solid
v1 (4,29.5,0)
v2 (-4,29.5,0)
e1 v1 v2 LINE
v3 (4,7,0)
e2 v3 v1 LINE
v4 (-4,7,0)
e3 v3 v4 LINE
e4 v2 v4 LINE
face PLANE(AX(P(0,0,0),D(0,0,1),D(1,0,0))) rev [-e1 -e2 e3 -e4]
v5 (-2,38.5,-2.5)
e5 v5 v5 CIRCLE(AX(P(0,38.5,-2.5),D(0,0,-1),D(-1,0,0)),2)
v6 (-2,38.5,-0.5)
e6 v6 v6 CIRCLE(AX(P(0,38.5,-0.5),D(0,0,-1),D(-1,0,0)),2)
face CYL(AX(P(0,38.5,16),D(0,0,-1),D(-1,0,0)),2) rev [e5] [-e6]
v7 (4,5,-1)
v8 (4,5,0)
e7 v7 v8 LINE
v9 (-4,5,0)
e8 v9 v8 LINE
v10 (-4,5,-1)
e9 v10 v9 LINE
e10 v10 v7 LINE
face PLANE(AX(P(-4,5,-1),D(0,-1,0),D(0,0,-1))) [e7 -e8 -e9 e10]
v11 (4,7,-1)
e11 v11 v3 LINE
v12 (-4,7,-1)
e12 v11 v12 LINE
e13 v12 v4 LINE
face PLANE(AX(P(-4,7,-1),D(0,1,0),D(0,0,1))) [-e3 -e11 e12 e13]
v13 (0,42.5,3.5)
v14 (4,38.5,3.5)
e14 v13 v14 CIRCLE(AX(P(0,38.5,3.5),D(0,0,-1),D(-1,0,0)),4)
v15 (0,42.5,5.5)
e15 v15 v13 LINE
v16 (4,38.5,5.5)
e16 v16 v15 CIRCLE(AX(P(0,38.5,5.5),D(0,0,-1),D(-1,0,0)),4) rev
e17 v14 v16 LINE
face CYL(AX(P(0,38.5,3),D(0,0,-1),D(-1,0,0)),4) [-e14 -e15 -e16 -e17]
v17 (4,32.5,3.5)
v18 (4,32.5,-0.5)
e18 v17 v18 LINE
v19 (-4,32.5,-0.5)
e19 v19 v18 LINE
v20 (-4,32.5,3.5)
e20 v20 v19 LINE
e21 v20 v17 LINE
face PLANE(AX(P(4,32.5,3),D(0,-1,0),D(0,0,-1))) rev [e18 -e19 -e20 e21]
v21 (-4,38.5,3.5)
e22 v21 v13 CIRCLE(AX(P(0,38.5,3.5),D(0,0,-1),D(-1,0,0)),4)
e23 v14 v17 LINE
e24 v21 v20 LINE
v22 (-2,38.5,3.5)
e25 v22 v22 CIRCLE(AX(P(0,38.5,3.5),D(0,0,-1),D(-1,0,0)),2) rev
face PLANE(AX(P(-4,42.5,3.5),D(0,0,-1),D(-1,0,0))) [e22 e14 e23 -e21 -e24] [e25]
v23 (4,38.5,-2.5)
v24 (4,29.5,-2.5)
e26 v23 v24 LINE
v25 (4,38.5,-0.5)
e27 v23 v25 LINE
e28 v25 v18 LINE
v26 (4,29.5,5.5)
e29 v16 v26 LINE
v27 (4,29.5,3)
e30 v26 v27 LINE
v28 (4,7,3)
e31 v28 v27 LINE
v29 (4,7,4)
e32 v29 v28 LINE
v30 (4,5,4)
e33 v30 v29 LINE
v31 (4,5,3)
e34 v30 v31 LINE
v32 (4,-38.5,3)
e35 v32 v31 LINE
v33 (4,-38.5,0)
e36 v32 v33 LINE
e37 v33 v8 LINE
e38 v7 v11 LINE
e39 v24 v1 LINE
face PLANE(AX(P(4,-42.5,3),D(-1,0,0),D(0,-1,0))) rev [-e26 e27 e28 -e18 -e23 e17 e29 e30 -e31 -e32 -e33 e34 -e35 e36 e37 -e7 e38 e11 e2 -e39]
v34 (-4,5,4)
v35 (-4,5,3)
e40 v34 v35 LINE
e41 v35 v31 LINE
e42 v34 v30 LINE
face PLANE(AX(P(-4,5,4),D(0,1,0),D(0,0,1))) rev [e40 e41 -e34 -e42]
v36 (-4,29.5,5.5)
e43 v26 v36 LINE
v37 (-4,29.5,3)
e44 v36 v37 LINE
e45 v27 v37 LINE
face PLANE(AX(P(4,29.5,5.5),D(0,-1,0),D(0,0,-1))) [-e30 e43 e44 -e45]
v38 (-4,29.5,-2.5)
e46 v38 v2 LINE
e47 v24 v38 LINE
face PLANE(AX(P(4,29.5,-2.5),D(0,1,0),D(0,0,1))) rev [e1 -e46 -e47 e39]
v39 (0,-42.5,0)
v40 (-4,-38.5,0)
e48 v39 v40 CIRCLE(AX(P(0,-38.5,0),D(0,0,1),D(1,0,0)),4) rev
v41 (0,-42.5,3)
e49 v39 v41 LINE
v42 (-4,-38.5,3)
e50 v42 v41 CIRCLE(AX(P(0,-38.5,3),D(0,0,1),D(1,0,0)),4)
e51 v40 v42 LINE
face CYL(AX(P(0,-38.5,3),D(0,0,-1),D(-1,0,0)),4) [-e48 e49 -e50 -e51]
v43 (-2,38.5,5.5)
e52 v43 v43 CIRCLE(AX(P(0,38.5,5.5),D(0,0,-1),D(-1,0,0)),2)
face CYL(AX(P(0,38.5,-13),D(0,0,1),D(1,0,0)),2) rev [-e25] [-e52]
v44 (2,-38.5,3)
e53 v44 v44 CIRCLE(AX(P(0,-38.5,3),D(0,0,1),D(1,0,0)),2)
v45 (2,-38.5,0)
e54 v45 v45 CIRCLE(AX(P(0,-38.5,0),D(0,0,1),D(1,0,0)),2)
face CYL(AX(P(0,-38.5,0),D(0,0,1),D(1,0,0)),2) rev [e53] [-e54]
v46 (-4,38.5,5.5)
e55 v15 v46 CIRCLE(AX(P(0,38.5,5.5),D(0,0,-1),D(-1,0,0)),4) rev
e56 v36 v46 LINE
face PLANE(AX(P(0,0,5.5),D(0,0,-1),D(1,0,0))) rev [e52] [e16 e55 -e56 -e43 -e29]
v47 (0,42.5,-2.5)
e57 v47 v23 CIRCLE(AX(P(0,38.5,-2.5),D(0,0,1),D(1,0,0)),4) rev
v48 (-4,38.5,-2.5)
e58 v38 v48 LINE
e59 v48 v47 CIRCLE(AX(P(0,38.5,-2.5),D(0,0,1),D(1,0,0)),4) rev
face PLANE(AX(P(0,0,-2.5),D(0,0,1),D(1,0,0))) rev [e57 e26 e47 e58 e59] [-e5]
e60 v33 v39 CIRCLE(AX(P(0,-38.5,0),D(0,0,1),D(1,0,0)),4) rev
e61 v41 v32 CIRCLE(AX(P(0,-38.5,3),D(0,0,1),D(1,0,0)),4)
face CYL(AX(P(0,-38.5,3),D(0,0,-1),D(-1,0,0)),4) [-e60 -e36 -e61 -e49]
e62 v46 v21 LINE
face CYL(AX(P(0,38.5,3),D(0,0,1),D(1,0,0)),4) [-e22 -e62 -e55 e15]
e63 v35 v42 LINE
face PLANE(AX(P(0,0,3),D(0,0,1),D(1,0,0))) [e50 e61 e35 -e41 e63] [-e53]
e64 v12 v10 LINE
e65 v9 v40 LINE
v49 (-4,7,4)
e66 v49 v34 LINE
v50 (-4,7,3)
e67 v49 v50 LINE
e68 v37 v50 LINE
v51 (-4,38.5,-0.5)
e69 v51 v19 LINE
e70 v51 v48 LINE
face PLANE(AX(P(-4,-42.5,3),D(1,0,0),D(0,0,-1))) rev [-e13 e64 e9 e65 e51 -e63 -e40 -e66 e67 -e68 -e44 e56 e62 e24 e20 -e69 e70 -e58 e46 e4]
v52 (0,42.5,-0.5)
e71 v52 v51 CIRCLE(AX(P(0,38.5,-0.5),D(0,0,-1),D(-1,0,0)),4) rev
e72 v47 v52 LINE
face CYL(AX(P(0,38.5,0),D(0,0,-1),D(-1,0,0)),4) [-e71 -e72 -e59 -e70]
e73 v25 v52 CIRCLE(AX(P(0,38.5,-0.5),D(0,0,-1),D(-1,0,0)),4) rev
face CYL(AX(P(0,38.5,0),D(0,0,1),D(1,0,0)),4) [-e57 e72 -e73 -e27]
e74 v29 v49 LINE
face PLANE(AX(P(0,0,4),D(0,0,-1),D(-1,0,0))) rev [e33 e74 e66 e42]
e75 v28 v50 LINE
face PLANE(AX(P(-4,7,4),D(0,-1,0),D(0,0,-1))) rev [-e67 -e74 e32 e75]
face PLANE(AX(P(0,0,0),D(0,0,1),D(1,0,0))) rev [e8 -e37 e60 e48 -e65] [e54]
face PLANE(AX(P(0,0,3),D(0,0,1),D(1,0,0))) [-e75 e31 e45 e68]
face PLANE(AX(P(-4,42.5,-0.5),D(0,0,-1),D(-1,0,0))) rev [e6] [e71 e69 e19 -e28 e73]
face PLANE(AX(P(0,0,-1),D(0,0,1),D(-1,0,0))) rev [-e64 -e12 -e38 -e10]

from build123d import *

# Parameters (mm, degrees)
CROQUIS1_W              = 8
CROQUIS1_H              = 75
SALIENTE_EXTRUIR1_DEPTH = 3
CROQUIS2_R              = 2
CORTAR_EXTRUIR1_DEPTH   = 43.793106922
CROQUIS3_W              = 8
CROQUIS3_H              = 2
SALIENTE_EXTRUIR2_DEPTH = 1
CROQUIS4_W              = 8
CROQUIS4_H              = 3
SALIENTE_EXTRUIR3_DEPTH = 2.5
CROQUIS5_W              = 8
CROQUIS5_H              = 2
SALIENTE_EXTRUIR4_DEPTH = 10
CROQUIS7_R              = 2
CORTAR_EXTRUIR3_DEPTH   = 18.5
REDONDEO2_R             = 4
REDONDEO5_R             = 4


with BuildPart() as part:
    # Croquis1 → Saliente-Extruir1 (new body)
    with BuildSketch(Plane.XY):
        with Locations((0, -5)):
            Rectangle(CROQUIS1_W, CROQUIS1_H)
    extrude(amount=SALIENTE_EXTRUIR1_DEPTH)

    # Croquis2 → Cortar-Extruir1 (cut, through all)
    with BuildSketch(Plane.XY.offset(3)):
        with Locations((0, -38.5)):
            Circle(CROQUIS2_R)
    extrude(amount=-CORTAR_EXTRUIR1_DEPTH, mode=Mode.SUBTRACT)

    # Croquis3 → Saliente-Extruir2 (add)
    with BuildSketch(Plane.XY.offset(3)):
        with Locations((0, 6)):
            Rectangle(CROQUIS3_W, CROQUIS3_H)
    saliente_extruir2 = extrude(amount=SALIENTE_EXTRUIR2_DEPTH)

    # Simetría1: Saliente-Extruir2 across plane
    add(saliente_extruir2.mirror(Plane.XY.offset(1.5)))

    # Croquis4 → Saliente-Extruir3 (add)
    with BuildSketch(Plane(origin=(0, 0, 0), x_dir=(-1, 0, 0), z_dir=(0, 0, -1))):
        with Locations((0, 31)):
            Rectangle(CROQUIS4_W, CROQUIS4_H)
    saliente_extruir3 = extrude(amount=SALIENTE_EXTRUIR3_DEPTH)

    # Croquis5 → Saliente-Extruir4 (add)
    with BuildSketch(Plane(origin=(0, 32.5, 0), x_dir=(1, 0, 0), z_dir=(0, 1, 0))):
        with Locations((0, 1.5)):
            Rectangle(CROQUIS5_W, CROQUIS5_H)
    saliente_extruir4 = extrude(amount=SALIENTE_EXTRUIR4_DEPTH)

    # Croquis7 → Cortar-Extruir3 (cut)
    with BuildSketch(Plane(origin=(0, 0, -2.5), x_dir=(-1, 0, 0), z_dir=(0, 0, -1))):
        with Locations((0, 38.5)):
            Circle(CROQUIS7_R)
    cortar_extruir3 = extrude(amount=-CORTAR_EXTRUIR3_DEPTH, mode=Mode.SUBTRACT)

    # Redondeo2
    redondeo2_edges = [part.edges().sort_by_distance(p)[0] for p in [
        (4, 42.5, -1.5),
        (-4, 42.5, -1.5),
        (-4, -42.5, 1.5),
        (4, -42.5, 1.5),
    ]]
    fillet(redondeo2_edges, radius=REDONDEO2_R - 0.0001)  # a hair under: the kernel refuses the full size

    # Simetría3: Saliente-Extruir3, Saliente-Extruir4, Cortar-Extruir3 across plane
    add(saliente_extruir3.mirror(Plane.XY.offset(1.5)))
    add(saliente_extruir4.mirror(Plane.XY.offset(1.5)))
    add(cortar_extruir3.mirror(Plane.XY.offset(1.5)), mode=Mode.SUBTRACT)

    # Redondeo5
    redondeo5_edges = [part.edges().sort_by_distance(p)[0] for p in [
        (-4, 42.5, 4.5),
        (4, 42.5, 4.5),
    ]]
    fillet(redondeo5_edges, radius=REDONDEO5_R - 0.0001)  # a hair under: the kernel refuses the full size


solid = part.part
